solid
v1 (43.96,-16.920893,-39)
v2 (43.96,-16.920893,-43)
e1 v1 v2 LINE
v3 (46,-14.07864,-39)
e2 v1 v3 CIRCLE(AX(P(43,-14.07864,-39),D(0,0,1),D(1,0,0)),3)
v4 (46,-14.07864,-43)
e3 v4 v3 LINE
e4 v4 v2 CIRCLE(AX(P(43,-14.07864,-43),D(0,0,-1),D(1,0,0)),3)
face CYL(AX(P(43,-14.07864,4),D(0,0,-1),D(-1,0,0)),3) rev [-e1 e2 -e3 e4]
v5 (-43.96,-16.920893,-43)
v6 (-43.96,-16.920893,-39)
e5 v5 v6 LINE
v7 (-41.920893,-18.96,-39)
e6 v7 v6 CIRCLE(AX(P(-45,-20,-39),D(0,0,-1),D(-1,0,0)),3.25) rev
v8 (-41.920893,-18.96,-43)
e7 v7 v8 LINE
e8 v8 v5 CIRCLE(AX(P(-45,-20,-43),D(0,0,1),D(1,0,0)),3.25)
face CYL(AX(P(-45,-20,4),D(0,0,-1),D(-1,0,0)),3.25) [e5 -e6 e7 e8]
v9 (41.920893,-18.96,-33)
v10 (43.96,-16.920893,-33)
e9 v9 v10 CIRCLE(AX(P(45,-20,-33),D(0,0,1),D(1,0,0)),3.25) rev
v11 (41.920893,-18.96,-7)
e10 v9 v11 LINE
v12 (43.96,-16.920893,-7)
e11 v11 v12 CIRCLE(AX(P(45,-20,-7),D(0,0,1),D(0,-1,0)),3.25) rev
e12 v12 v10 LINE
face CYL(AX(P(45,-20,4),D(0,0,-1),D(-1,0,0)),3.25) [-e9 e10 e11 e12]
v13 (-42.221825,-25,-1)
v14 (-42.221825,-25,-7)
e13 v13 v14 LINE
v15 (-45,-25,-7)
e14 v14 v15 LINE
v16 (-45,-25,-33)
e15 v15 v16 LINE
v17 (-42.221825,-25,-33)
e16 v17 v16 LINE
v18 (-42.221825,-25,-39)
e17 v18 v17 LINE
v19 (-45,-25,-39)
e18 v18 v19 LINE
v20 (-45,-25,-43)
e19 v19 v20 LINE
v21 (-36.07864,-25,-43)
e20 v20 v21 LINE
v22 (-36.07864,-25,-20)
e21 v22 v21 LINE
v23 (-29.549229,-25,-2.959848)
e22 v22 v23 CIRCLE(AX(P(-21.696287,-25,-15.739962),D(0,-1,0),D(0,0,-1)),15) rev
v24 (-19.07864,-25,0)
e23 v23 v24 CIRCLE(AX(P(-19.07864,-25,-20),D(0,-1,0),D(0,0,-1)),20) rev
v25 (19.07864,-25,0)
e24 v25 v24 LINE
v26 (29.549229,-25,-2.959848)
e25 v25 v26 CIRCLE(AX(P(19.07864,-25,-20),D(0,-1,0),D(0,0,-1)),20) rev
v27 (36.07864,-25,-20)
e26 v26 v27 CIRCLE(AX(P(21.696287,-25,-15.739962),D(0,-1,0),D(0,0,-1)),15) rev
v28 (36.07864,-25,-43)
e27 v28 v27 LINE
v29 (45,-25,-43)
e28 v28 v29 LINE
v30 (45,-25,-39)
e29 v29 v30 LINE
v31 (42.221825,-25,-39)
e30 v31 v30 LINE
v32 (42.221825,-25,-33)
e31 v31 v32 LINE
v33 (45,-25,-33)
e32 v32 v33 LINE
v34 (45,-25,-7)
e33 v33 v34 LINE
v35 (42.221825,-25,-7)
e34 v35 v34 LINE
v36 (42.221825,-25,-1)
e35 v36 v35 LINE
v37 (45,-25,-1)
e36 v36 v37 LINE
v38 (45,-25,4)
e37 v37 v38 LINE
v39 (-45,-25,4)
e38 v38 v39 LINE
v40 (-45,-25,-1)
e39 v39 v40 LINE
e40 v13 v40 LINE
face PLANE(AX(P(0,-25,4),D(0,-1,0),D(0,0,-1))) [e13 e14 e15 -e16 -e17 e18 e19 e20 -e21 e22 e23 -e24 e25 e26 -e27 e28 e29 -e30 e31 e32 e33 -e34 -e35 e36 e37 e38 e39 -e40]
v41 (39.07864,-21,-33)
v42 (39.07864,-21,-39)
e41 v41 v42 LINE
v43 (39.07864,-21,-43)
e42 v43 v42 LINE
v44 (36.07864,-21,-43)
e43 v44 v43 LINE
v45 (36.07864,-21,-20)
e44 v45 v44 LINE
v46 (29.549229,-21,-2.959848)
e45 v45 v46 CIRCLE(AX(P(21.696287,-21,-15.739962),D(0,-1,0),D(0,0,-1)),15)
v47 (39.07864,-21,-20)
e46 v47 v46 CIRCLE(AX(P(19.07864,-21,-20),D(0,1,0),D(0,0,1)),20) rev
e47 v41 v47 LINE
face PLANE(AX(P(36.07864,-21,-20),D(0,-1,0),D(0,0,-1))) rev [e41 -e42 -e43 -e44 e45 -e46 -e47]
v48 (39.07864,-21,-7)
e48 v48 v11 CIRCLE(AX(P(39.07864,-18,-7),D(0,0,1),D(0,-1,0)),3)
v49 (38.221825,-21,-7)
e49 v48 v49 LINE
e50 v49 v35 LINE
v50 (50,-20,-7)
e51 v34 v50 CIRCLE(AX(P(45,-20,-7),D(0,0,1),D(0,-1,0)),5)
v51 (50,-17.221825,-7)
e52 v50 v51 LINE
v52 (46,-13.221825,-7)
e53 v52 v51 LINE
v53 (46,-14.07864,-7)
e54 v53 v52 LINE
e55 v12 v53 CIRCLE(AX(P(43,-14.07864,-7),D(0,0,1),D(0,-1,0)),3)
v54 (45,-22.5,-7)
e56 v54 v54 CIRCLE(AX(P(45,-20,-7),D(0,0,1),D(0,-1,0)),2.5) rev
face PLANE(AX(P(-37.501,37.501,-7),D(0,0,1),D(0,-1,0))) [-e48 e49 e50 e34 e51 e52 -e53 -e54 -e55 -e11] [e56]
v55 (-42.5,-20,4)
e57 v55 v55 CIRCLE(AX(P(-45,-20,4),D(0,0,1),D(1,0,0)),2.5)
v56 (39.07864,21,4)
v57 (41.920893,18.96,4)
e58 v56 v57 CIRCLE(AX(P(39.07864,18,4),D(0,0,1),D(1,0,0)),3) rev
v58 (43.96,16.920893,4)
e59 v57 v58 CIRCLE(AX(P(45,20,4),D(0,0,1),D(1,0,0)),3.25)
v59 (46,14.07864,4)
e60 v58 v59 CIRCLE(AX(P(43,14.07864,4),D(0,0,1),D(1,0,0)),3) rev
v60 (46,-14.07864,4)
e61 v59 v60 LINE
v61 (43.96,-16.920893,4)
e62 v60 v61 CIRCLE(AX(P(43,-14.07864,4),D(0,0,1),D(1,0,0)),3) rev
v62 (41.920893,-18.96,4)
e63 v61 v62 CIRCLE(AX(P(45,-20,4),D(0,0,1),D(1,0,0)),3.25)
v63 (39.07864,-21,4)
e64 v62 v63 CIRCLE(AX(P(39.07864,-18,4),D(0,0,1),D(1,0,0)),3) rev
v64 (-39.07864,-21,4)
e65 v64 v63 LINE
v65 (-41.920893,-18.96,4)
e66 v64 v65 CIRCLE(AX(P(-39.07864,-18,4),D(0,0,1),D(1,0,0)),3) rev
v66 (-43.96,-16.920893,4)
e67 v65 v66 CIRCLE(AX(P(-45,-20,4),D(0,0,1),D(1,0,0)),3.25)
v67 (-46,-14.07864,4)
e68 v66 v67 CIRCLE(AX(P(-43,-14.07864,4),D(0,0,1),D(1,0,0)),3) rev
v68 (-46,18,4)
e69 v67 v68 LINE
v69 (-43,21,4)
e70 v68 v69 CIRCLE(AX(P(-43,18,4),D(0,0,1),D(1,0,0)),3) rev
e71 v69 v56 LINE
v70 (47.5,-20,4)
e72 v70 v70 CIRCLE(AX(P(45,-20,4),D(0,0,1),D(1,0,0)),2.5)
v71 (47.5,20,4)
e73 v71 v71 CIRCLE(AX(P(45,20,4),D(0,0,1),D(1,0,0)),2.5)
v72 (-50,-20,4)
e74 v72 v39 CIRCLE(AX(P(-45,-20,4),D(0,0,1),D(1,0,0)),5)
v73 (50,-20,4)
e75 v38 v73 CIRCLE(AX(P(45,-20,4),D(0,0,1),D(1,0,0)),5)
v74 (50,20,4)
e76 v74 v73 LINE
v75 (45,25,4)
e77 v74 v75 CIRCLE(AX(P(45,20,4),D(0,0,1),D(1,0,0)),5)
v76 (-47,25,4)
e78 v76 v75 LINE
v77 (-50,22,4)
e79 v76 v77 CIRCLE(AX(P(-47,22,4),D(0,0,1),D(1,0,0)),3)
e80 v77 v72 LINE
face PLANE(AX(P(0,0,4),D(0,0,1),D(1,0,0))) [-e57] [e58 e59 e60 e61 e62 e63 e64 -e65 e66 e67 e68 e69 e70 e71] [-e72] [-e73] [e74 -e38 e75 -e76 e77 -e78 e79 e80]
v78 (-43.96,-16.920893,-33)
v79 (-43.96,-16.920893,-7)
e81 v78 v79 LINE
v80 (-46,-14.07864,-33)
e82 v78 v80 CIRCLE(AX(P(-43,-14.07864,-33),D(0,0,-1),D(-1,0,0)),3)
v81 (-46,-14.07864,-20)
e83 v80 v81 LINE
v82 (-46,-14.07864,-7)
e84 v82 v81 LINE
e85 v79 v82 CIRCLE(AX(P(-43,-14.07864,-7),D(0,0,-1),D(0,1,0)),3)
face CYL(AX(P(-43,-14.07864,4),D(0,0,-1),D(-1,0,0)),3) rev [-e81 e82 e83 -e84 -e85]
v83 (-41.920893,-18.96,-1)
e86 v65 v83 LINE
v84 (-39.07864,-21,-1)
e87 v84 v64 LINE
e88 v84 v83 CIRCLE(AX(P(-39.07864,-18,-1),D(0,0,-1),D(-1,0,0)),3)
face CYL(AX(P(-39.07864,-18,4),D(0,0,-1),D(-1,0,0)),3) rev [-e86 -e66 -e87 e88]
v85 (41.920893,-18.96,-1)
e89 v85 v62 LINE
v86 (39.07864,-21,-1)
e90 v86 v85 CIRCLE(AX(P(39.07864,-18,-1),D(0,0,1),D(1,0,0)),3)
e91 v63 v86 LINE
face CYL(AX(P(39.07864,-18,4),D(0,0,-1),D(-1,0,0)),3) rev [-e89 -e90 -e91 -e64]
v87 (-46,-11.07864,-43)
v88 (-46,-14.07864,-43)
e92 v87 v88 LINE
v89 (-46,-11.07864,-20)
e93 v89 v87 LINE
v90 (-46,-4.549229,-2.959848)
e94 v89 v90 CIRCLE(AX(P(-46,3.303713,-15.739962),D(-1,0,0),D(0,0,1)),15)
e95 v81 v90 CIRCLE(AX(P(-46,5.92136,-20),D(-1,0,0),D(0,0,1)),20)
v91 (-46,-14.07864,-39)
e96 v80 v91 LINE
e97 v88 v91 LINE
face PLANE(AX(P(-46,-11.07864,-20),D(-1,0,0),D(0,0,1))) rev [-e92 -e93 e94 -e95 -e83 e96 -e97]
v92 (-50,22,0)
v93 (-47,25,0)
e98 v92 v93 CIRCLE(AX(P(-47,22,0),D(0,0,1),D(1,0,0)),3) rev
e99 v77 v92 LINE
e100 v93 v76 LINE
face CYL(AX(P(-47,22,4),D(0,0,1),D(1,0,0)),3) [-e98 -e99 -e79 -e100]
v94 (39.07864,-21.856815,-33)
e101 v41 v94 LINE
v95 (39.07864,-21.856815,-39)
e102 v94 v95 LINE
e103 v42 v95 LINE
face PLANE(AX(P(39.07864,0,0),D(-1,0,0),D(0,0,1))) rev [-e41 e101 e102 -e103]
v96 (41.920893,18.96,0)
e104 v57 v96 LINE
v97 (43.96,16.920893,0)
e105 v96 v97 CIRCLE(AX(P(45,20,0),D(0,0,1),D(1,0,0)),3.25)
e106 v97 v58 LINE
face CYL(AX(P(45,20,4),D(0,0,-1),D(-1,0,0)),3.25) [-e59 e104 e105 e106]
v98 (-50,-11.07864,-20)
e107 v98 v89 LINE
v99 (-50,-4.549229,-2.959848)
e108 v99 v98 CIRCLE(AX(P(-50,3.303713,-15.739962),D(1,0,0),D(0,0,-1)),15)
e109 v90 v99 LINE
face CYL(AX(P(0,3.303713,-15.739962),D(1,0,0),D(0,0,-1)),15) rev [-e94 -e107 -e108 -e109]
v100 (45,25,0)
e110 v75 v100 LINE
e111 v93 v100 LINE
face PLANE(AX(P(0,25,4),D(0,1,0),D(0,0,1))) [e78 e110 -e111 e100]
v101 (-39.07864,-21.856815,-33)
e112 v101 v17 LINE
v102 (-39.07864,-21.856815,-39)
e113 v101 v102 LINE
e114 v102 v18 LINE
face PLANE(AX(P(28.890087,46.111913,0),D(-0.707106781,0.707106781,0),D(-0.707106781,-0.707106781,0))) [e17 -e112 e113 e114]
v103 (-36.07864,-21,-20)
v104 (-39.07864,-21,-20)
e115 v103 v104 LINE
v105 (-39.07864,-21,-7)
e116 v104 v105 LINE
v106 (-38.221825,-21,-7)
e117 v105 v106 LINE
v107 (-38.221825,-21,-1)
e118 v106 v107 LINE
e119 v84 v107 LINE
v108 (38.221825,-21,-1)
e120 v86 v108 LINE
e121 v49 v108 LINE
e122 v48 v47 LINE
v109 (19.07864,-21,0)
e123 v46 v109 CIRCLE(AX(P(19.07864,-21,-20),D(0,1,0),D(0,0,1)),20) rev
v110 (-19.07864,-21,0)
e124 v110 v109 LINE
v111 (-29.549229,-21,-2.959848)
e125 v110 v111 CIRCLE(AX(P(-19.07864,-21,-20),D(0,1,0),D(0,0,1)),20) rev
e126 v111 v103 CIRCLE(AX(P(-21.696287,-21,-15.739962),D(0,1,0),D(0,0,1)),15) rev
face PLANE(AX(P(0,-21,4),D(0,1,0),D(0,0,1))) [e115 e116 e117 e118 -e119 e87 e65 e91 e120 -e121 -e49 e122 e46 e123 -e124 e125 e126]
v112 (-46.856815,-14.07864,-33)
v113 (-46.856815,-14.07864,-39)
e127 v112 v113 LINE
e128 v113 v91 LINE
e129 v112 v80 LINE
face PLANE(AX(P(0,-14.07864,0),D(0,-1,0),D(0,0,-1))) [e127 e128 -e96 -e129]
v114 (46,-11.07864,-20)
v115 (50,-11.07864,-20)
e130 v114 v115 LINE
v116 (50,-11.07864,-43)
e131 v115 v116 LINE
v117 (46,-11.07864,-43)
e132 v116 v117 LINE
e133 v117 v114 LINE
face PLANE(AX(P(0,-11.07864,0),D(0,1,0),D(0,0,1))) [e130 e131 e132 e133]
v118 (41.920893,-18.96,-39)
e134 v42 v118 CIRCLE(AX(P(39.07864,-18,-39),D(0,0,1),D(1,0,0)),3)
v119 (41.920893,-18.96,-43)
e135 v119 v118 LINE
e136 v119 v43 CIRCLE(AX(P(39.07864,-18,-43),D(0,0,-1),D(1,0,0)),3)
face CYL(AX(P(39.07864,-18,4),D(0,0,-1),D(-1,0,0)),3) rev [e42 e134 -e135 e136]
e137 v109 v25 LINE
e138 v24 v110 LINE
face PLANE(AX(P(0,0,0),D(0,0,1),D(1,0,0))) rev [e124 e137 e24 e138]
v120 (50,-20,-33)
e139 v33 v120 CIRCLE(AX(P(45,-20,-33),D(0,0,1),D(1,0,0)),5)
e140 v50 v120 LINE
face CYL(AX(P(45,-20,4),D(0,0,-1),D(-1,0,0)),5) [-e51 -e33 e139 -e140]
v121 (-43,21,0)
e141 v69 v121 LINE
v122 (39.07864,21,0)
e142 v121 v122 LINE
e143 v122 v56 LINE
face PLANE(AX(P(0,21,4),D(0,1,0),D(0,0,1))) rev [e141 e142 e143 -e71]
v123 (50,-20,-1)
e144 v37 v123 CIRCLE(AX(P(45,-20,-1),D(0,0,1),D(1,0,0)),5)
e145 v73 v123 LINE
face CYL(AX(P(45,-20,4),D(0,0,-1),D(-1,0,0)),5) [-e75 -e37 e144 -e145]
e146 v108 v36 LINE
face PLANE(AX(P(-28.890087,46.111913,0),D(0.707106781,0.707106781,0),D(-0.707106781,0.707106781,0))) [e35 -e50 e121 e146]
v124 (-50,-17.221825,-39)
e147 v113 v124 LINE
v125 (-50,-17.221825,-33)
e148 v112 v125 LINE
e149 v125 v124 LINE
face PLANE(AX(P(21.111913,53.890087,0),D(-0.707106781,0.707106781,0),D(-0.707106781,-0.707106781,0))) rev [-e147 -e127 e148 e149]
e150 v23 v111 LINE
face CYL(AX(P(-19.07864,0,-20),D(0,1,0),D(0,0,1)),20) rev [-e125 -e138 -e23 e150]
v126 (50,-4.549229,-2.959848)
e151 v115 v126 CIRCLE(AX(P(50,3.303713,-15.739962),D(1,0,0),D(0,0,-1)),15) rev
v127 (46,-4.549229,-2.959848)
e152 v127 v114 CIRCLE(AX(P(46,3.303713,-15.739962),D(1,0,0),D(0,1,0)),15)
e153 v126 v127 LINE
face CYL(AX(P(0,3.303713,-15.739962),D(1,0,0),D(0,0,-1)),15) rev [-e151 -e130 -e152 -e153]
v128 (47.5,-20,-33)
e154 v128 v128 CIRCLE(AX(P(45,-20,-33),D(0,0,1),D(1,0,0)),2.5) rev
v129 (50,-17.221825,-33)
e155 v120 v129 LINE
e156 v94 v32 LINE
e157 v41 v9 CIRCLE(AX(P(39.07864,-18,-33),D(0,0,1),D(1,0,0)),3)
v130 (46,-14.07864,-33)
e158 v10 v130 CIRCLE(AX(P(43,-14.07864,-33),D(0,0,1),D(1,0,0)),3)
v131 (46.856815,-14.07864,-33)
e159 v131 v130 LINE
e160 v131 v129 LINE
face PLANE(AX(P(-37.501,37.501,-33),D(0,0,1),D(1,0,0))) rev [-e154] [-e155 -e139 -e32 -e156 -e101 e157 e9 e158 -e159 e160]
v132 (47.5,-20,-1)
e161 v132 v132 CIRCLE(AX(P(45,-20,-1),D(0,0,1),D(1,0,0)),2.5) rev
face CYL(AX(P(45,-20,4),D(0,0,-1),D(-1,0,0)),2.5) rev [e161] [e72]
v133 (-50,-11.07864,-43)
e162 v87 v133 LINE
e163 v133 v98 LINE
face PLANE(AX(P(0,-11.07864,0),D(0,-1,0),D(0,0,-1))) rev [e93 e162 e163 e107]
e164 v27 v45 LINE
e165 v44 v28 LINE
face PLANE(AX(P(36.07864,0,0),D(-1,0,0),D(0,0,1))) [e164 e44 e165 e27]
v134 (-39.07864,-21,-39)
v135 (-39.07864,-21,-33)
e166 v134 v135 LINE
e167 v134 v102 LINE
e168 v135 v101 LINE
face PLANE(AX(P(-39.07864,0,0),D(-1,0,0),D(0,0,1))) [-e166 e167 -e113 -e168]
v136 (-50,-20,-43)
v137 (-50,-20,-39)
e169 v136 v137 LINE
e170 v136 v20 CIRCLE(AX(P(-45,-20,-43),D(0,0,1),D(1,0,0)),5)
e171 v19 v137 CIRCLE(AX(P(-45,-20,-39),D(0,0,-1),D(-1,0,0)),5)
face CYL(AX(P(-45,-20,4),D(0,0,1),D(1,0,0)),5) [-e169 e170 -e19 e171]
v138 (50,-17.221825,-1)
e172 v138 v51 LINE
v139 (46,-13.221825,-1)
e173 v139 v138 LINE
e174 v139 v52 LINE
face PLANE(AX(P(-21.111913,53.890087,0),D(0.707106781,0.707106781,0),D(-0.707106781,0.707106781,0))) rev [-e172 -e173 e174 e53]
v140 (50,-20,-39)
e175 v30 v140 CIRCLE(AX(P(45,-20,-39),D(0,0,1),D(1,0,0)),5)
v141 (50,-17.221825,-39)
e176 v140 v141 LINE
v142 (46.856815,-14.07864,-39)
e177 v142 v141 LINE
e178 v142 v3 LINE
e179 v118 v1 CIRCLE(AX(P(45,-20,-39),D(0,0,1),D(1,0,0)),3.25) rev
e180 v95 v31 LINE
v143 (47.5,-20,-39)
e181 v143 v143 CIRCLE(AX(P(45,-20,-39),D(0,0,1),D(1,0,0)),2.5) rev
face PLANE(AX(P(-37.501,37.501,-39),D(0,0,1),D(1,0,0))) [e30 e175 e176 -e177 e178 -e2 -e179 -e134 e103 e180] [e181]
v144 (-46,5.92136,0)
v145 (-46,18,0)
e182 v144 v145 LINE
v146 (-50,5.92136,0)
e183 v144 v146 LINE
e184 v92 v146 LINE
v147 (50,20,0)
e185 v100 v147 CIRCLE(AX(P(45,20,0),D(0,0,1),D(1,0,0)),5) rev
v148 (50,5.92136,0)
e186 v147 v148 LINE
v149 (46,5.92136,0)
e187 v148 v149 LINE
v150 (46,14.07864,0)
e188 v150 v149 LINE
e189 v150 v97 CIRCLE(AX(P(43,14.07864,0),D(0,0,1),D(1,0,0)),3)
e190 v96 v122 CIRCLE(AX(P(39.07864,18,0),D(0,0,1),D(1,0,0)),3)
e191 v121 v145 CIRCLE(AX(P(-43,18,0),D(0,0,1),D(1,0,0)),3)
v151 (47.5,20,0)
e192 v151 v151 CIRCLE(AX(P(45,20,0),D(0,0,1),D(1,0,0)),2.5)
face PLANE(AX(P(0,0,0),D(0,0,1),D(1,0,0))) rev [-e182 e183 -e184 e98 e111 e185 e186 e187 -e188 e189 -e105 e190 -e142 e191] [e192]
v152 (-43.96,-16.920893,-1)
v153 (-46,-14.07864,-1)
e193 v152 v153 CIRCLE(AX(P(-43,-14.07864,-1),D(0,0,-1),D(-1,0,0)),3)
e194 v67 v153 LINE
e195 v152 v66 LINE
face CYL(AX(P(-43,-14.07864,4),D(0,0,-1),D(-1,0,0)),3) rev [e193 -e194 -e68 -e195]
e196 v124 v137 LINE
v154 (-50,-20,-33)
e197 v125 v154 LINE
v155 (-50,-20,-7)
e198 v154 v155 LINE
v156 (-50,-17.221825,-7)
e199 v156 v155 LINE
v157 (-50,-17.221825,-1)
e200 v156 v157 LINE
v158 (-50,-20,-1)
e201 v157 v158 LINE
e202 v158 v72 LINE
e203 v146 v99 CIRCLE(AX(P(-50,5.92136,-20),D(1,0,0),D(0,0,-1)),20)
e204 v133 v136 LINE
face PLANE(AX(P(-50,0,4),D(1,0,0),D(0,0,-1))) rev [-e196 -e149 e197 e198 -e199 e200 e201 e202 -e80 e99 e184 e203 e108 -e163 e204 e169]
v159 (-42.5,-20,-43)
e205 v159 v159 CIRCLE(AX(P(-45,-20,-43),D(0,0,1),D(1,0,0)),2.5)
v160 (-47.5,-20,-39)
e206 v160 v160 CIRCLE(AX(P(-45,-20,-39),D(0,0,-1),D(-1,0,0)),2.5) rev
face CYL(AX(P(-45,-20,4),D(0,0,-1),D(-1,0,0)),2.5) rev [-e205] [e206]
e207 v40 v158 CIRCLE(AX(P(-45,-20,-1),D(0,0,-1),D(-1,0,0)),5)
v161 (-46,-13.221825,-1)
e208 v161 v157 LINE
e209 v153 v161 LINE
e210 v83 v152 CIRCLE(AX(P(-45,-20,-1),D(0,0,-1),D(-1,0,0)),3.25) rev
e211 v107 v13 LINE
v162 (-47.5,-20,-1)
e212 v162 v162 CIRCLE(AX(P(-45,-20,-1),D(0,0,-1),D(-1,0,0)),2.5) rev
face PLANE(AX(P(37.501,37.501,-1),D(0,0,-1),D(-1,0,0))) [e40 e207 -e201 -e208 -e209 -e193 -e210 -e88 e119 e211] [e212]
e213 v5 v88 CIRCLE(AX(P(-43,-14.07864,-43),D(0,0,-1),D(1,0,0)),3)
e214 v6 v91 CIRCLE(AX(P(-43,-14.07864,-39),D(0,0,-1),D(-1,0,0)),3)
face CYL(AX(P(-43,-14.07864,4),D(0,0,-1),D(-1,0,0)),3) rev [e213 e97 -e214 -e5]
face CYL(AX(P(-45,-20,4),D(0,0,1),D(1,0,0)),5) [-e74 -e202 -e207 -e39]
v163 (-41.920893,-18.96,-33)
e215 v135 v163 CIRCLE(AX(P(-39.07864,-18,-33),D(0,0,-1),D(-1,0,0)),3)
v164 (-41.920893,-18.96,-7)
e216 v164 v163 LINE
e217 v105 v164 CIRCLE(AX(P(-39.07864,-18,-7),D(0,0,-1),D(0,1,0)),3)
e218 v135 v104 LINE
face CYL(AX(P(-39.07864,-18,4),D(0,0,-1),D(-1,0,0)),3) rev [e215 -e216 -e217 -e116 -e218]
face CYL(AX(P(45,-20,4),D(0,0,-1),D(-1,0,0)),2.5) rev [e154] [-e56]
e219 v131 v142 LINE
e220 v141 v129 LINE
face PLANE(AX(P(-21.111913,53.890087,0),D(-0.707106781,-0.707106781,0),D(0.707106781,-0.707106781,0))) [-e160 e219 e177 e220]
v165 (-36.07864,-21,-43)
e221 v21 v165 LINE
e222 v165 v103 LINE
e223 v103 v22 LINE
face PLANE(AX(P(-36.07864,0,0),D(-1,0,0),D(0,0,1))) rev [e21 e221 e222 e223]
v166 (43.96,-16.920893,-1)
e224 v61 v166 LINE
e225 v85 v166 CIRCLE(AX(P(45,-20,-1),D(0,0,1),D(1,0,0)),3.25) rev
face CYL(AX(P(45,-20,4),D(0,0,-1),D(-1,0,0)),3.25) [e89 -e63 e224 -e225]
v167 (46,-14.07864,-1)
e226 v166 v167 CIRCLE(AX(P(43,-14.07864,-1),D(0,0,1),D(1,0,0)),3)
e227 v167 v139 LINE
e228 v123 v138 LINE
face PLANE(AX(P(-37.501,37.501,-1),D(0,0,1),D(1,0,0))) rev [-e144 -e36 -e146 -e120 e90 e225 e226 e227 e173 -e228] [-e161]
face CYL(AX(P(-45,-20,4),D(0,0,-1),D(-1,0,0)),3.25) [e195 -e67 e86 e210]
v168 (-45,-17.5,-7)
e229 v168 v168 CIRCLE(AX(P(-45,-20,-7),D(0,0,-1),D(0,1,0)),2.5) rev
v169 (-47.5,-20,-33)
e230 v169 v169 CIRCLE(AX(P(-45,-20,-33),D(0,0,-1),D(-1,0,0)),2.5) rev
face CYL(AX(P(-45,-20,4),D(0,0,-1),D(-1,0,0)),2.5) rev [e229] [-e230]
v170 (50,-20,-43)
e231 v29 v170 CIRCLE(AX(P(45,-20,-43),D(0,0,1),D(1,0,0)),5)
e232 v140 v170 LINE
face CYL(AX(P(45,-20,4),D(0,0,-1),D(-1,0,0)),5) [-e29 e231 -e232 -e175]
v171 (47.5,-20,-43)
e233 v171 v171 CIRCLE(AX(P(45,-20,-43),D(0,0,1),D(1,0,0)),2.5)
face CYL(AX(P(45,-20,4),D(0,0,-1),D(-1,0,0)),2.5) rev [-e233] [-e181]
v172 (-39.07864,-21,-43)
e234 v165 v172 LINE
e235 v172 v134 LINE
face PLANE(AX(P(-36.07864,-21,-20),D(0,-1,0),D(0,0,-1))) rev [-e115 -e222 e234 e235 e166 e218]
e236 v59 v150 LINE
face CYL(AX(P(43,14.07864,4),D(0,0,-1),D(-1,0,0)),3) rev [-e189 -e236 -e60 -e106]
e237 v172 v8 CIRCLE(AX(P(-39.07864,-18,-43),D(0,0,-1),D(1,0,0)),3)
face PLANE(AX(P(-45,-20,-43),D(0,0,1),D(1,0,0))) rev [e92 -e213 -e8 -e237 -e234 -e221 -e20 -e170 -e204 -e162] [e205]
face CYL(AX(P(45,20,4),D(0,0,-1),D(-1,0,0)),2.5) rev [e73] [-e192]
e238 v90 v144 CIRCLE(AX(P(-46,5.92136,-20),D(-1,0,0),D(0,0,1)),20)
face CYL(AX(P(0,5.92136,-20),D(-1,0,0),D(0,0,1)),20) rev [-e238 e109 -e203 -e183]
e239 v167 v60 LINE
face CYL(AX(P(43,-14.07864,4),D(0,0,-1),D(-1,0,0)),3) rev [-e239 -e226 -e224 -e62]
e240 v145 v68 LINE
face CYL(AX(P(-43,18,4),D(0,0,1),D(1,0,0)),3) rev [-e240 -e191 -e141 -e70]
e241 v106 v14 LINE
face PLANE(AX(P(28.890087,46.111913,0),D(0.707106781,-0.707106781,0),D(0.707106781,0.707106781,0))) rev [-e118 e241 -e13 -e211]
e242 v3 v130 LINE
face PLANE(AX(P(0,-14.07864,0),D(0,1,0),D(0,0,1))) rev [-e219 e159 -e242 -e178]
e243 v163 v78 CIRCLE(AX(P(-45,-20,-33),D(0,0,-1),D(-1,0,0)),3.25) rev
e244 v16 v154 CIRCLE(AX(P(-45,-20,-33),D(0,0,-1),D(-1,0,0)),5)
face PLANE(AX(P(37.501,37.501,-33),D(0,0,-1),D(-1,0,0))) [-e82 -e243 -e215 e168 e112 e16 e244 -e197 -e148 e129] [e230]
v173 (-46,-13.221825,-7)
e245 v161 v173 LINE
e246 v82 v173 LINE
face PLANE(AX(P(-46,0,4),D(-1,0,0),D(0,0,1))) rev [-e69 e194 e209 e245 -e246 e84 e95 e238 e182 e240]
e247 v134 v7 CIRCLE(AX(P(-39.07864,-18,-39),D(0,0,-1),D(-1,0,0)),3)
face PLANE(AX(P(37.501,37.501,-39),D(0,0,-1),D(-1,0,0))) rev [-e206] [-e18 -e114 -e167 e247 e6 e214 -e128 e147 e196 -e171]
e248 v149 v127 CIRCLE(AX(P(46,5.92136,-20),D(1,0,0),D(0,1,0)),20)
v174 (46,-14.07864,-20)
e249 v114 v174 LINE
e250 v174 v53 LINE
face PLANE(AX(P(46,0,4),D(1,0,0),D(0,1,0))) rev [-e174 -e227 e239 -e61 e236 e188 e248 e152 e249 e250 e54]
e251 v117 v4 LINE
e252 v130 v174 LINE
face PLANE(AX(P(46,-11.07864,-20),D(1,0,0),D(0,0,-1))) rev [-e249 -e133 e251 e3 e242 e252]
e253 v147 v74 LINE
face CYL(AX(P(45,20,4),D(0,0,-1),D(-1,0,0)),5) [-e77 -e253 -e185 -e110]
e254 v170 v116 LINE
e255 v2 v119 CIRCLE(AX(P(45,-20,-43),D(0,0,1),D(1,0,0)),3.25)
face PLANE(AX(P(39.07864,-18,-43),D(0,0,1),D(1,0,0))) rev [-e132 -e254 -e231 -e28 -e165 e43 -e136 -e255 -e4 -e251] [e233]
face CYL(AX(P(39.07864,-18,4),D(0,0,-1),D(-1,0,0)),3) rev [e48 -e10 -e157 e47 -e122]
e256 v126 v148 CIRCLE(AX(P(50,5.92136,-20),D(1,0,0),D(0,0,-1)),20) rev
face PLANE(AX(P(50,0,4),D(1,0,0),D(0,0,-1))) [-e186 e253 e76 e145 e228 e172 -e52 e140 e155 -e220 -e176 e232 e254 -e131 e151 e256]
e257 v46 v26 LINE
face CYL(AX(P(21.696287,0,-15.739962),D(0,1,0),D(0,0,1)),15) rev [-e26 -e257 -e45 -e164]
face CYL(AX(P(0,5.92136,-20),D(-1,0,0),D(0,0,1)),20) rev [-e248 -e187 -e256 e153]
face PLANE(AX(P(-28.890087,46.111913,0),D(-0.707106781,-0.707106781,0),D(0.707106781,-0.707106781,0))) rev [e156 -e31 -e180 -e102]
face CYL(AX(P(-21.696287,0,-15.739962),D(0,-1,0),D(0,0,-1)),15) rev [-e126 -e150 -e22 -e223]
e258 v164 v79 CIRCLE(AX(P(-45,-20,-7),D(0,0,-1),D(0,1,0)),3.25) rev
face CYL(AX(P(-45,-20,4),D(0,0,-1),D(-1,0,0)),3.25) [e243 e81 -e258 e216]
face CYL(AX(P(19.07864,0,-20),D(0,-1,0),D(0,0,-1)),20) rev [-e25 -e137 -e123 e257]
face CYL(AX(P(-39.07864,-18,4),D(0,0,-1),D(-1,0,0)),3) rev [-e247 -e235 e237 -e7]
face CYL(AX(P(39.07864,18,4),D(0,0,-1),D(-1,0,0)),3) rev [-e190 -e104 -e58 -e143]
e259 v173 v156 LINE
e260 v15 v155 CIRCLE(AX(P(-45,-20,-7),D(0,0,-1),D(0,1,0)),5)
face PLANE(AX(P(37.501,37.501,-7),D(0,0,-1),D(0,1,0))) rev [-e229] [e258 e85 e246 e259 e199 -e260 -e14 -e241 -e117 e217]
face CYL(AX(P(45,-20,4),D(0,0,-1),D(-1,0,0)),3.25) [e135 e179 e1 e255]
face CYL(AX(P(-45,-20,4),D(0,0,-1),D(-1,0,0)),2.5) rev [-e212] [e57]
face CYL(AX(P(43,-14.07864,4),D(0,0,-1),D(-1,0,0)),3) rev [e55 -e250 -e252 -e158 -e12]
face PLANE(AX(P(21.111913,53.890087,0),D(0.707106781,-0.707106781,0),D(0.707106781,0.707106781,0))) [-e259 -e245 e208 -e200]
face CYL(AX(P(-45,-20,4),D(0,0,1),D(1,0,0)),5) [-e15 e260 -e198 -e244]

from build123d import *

# Parameters (mm, degrees)
SKETCH1_R           = 2.5
BOSS_EXTRUDE2_DEPTH = 4
FILLET1_R           = 5
FILLET2_R           = 3
FILLET3_R           = 3
BOSS_EXTRUDE3_START = -47
SKETCH2_R           = 2.5
BOSS_EXTRUDE3_DEPTH = 47
FILLET4_R           = 20
CUT_EXTRUDE1_REACH  = 115.914
SKETCH3_W           = 6
SKETCH3_H           = 11
SKETCH4_W           = 4
SKETCH4_H           = 23
BOSS_EXTRUDE4_DEPTH = 3
FILLET5_START       = -50
FILLET5_DEPTH       = 4
FILLET5_START_2     = 46
FILLET5_2_DEPTH     = 4
SKETCH5_W           = 23
SKETCH5_H           = 4
BOSS_EXTRUDE5_DEPTH = 3
FILLET6_START       = -25
FILLET6_DEPTH       = 4
SKETCH6_W           = 23
SKETCH6_H           = 4
BOSS_EXTRUDE6_DEPTH = 3
FILLET7_START       = -25
FILLET7_DEPTH       = 4


with BuildPart() as part:
    # Sketch1 → Boss-Extrude2 (new body)
    with BuildSketch(Plane.XY):
        Polygon((-50, -25), (-41.75, -25), (41.75, -25), (50, -25), (50, -16.75), (50, 16.75), (50, 25), (41.75, 25), (-50, 25), (-50, -16.75), align=None)
        with Locations((-45, -20)):
            Circle(SKETCH1_R, mode=Mode.SUBTRACT)
        with Locations((45, -20)):
            Circle(SKETCH1_R, mode=Mode.SUBTRACT)
        with BuildLine():
            Line((-45, -16.75), (-46, -16.75))
            Line((-46, -16.75), (-46, 21))
            Line((-46, 21), (41.75, 21))
            Line((41.75, 21), (41.75, 20))
            ThreePointArc((41.75, 20), (42.701902961, 17.701902961), (45, 16.75))
            Line((45, 16.75), (46, 16.75))
            Line((46, 16.75), (46, -16.75))
            Line((46, -16.75), (45, -16.75))
            ThreePointArc((45, -16.75), (42.701902961, -17.701902961), (41.75, -20))
            Line((41.75, -20), (41.75, -21))
            Line((41.75, -21), (-41.75, -21))
            Line((-41.75, -21), (-41.75, -20))
            ThreePointArc((-41.75, -20), (-42.701902961, -17.701902961), (-45, -16.75))
        make_face(mode=Mode.SUBTRACT)
        with Locations((45, 20)):
            Circle(SKETCH1_R, mode=Mode.SUBTRACT)
    extrude(amount=BOSS_EXTRUDE2_DEPTH)

    # Fillet1
    fillet1_edges = [part.edges().sort_by_distance(p)[0] for p in [
        (50, 25, 2),
        (50, -25, 2),
        (-50, -25, 2),
    ]]
    fillet(fillet1_edges, radius=FILLET1_R)

    # Fillet2
    fillet2_edges = [part.edges().sort_by_distance(p)[0] for p in [
        (41.75, 21, 2),
        (46, 16.75, 2),
        (46, -16.75, 2),
        (41.75, -21, 2),
        (-41.75, -21, 2),
        (-46, -16.75, 2),
    ]]
    fillet(fillet2_edges, radius=FILLET2_R)

    # Fillet3
    fillet3_edges = [part.edges().sort_by_distance(p)[0] for p in [
        (-46, 21, 2),
        (-50, 25, 2),
    ]]
    fillet(fillet3_edges, radius=FILLET3_R)

    # Sketch2 → Boss-Extrude3 (add)
    # profile 1 of 2: a face of its own
    with BuildSketch(Plane.XY.offset(4).offset(BOSS_EXTRUDE3_START)):
        with BuildLine():
            Line((-46, -14.078640359), (-50, -14.078640359))
            Line((-50, -14.078640359), (-50, -16.75))
            Line((-50, -16.75), (-50, -20))
            ThreePointArc((-50, -20), (-48.535533906, -23.535533906), (-45, -25))
            Line((-45, -25), (-41.75, -25))
            Line((-41.75, -25), (-39.078640359, -25))
            Line((-39.078640359, -25), (-39.078640359, -21))
            ThreePointArc((-39.078640359, -21), (-40.827925927, -20.437211521), (-41.920892987, -18.96))
            ThreePointArc((-41.920892987, -18.96), (-42.701902961, -17.701902961), (-43.96, -16.920892987))
            ThreePointArc((-43.96, -16.920892987), (-45.437211521, -15.827925927), (-46, -14.078640359))
        make_face()
        with Locations((-45, -20)):
            Circle(SKETCH2_R, mode=Mode.SUBTRACT)
    # profile 2 of 2: a face of its own
    with BuildSketch(Plane.XY.offset(4).offset(BOSS_EXTRUDE3_START)):
        with BuildLine():
            Line((39.078640359, -21), (39.078640359, -25))
            Line((39.078640359, -25), (45, -25))
            ThreePointArc((45, -25), (48.535533906, -23.535533906), (50, -20))
            Line((50, -20), (50, -14.078640359))
            Line((50, -14.078640359), (46, -14.078640359))
            ThreePointArc((46, -14.078640359), (45.437211521, -15.827925927), (43.96, -16.920892987))
            ThreePointArc((43.96, -16.920892987), (42.701902961, -17.701902961), (41.920892987, -18.96))
            ThreePointArc((41.920892987, -18.96), (40.827925927, -20.437211521), (39.078640359, -21))
        make_face()
        with Locations((45, -20)):
            Circle(SKETCH2_R, mode=Mode.SUBTRACT)
    extrude(amount=BOSS_EXTRUDE3_DEPTH)

    # Fillet4
    # the kernel refuses this fillet: 20 mm, written as the material it adds along each edge
    with BuildSketch(Plane(origin=(-50, -14.078640359, 0), x_dir=(0, 1, 0), z_dir=(1, 0, 0)), Plane(origin=(39.078640359, -25, 0), x_dir=(-1, 0, 0), z_dir=(0, 1, 0))) as fillet4_piece_1:
        with BuildLine():
            CenterArc((FILLET4_R, -FILLET4_R), FILLET4_R, 90, 90)
            Line((0, -FILLET4_R), (0, 0))
            Line((0, 0), (FILLET4_R, 0))
        make_face()
    extrude(amount=4)
    with BuildSketch(Plane(origin=(-39.078640359, -21, 0), x_dir=(0, 0, -1), z_dir=(0, -1, 0)), Plane(origin=(46, -14.078640359, 0), x_dir=(0, 0, -1), z_dir=(1, 0, 0))) as fillet4_piece_2:
        with BuildLine():
            CenterArc((FILLET4_R, FILLET4_R), FILLET4_R, 180, 90)
            Line((0, FILLET4_R), (0, 0))
            Line((0, 0), (FILLET4_R, 0))
        make_face()
    extrude(amount=4)

    # Sketch3 → Cut-Extrude1 (cut, up to next)
    with BuildSketch(Plane(origin=(-36.035533906, -36.035533906, 0), x_dir=(0, 0, -1), z_dir=(0.707106781186548, 0.7071067811865471, 0)), mode=Mode.PRIVATE) as cut_extrude1_sk1:
        with Locations((4, 17.67766953)):
            Rectangle(SKETCH3_W, SKETCH3_H)
    cut_extrude1_tool1 = extrude(cut_extrude1_sk1.sketch, amount=CUT_EXTRUDE1_REACH, mode=Mode.PRIVATE) & part.part
    # Sketch3 → Cut-Extrude1 (cut, up to next)
    with BuildSketch(Plane(origin=(-36.035533906, -36.035533906, 0), x_dir=(0, 0, -1), z_dir=(0.707106781186548, 0.7071067811865471, 0)), mode=Mode.PRIVATE) as cut_extrude1_sk2:
        with Locations((36, 17.67766953)):
            Rectangle(SKETCH3_W, SKETCH3_H)
    cut_extrude1_tool2 = extrude(cut_extrude1_sk2.sketch, amount=CUT_EXTRUDE1_REACH, mode=Mode.PRIVATE) & part.part
    cut_extrude1_1 = cut_extrude1_tool1.solids().sort_by_distance((-48.535534, -23.535534, -4))[0]
    add(cut_extrude1_1, mode=Mode.SUBTRACT)
    cut_extrude1_2 = cut_extrude1_tool2.solids().sort_by_distance((-48.535534, -23.535534, -36))[0]
    add(cut_extrude1_2, mode=Mode.SUBTRACT)
    cut_extrude1 = cut_extrude1_1 + cut_extrude1_2  # Cut-Extrude1 as one shape, for the pattern or mirror that repeats it

    # Mirror1: Cut-Extrude1 across plane
    add(cut_extrude1.mirror(Plane(origin=(0, 0, 0), x_dir=(0, 0, 1), z_dir=(1, 0, 0))), mode=Mode.SUBTRACT)

    # Sketch4 → Boss-Extrude4 (add)
    with BuildSketch(Plane(origin=(0, -14.078640359, 0), x_dir=(1, 0, 0), z_dir=(0, 1, 0))):
        with Locations((-48, 31.5)):
            Rectangle(SKETCH4_W, SKETCH4_H)
        with Locations((48, 31.5)):
            Rectangle(SKETCH4_W, SKETCH4_H)
    extrude(amount=BOSS_EXTRUDE4_DEPTH)

    # Fillet5: read off the stored shape, not the designer's step
    # Fillet5 outline → Fillet5 (add)
    with BuildSketch(Plane.YZ.offset(FILLET5_START)):
        with BuildLine():
            ThreePointArc((-11.078640359, -20), (-10.703206123, -10.372818577), (-4.549228594, -2.959847946))
            ThreePointArc((-4.549228594, -2.959847946), (-11.534466961, -10.238129398), (-14.078640359, -20))
            Line((-14.078640359, -20), (-11.078640359, -20))
        make_face()
    extrude(amount=FILLET5_DEPTH)

    # Fillet5 2 outline → Fillet5 2 (add)
    with BuildSketch(Plane.YZ.offset(FILLET5_START_2)):
        with BuildLine():
            ThreePointArc((-11.078640359, -20), (-10.703206123, -10.372818577), (-4.549228594, -2.959847946))
            ThreePointArc((-4.549228594, -2.959847946), (-11.534466961, -10.238129398), (-14.078640359, -20))
            Line((-14.078640359, -20), (-11.078640359, -20))
        make_face()
    extrude(amount=FILLET5_2_DEPTH)

    # Sketch5 → Boss-Extrude5 (add)
    with BuildSketch(Plane(origin=(-39.078640359, 0, 0), x_dir=(0, 0, -1), z_dir=(1, 0, 0))):
        with Locations((31.5, -23)):
            Rectangle(SKETCH5_W, SKETCH5_H)
    extrude(amount=BOSS_EXTRUDE5_DEPTH)

    # Fillet6: read off the stored shape, not the designer's step
    # Fillet6 outline → Fillet6 (add)
    with BuildSketch(Plane(origin=(0, 0, 0), x_dir=(1, 0, 0), z_dir=(0, 1, 0)).offset(FILLET6_START)):
        with BuildLine():
            ThreePointArc((-39.078640359, 20), (-36.534466961, 10.238129398), (-29.549228594, 2.959847946))
            ThreePointArc((-29.549228594, 2.959847946), (-35.703206123, 10.372818577), (-36.078640359, 20))
            Line((-36.078640359, 20), (-39.078640359, 20))
        make_face()
    extrude(amount=FILLET6_DEPTH)

    # Sketch6 → Boss-Extrude6 (add)
    with BuildSketch(Plane.ZY.offset(-39.078640359)):
        with Locations((-31.5, -23)):
            Rectangle(SKETCH6_W, SKETCH6_H)
    extrude(amount=BOSS_EXTRUDE6_DEPTH)

    # Fillet7: read off the stored shape, not the designer's step
    # Fillet7 outline → Fillet7 (add)
    with BuildSketch(Plane(origin=(0, 0, 0), x_dir=(1, 0, 0), z_dir=(0, 1, 0)).offset(FILLET7_START)):
        with BuildLine():
            ThreePointArc((36.078640359, 20), (35.703206123, 10.372818577), (29.549228594, 2.959847946))
            ThreePointArc((29.549228594, 2.959847946), (36.534466961, 10.238129398), (39.078640359, 20))
            Line((39.078640359, 20), (36.078640359, 20))
        make_face()
    extrude(amount=FILLET7_DEPTH)


solid = part.part
